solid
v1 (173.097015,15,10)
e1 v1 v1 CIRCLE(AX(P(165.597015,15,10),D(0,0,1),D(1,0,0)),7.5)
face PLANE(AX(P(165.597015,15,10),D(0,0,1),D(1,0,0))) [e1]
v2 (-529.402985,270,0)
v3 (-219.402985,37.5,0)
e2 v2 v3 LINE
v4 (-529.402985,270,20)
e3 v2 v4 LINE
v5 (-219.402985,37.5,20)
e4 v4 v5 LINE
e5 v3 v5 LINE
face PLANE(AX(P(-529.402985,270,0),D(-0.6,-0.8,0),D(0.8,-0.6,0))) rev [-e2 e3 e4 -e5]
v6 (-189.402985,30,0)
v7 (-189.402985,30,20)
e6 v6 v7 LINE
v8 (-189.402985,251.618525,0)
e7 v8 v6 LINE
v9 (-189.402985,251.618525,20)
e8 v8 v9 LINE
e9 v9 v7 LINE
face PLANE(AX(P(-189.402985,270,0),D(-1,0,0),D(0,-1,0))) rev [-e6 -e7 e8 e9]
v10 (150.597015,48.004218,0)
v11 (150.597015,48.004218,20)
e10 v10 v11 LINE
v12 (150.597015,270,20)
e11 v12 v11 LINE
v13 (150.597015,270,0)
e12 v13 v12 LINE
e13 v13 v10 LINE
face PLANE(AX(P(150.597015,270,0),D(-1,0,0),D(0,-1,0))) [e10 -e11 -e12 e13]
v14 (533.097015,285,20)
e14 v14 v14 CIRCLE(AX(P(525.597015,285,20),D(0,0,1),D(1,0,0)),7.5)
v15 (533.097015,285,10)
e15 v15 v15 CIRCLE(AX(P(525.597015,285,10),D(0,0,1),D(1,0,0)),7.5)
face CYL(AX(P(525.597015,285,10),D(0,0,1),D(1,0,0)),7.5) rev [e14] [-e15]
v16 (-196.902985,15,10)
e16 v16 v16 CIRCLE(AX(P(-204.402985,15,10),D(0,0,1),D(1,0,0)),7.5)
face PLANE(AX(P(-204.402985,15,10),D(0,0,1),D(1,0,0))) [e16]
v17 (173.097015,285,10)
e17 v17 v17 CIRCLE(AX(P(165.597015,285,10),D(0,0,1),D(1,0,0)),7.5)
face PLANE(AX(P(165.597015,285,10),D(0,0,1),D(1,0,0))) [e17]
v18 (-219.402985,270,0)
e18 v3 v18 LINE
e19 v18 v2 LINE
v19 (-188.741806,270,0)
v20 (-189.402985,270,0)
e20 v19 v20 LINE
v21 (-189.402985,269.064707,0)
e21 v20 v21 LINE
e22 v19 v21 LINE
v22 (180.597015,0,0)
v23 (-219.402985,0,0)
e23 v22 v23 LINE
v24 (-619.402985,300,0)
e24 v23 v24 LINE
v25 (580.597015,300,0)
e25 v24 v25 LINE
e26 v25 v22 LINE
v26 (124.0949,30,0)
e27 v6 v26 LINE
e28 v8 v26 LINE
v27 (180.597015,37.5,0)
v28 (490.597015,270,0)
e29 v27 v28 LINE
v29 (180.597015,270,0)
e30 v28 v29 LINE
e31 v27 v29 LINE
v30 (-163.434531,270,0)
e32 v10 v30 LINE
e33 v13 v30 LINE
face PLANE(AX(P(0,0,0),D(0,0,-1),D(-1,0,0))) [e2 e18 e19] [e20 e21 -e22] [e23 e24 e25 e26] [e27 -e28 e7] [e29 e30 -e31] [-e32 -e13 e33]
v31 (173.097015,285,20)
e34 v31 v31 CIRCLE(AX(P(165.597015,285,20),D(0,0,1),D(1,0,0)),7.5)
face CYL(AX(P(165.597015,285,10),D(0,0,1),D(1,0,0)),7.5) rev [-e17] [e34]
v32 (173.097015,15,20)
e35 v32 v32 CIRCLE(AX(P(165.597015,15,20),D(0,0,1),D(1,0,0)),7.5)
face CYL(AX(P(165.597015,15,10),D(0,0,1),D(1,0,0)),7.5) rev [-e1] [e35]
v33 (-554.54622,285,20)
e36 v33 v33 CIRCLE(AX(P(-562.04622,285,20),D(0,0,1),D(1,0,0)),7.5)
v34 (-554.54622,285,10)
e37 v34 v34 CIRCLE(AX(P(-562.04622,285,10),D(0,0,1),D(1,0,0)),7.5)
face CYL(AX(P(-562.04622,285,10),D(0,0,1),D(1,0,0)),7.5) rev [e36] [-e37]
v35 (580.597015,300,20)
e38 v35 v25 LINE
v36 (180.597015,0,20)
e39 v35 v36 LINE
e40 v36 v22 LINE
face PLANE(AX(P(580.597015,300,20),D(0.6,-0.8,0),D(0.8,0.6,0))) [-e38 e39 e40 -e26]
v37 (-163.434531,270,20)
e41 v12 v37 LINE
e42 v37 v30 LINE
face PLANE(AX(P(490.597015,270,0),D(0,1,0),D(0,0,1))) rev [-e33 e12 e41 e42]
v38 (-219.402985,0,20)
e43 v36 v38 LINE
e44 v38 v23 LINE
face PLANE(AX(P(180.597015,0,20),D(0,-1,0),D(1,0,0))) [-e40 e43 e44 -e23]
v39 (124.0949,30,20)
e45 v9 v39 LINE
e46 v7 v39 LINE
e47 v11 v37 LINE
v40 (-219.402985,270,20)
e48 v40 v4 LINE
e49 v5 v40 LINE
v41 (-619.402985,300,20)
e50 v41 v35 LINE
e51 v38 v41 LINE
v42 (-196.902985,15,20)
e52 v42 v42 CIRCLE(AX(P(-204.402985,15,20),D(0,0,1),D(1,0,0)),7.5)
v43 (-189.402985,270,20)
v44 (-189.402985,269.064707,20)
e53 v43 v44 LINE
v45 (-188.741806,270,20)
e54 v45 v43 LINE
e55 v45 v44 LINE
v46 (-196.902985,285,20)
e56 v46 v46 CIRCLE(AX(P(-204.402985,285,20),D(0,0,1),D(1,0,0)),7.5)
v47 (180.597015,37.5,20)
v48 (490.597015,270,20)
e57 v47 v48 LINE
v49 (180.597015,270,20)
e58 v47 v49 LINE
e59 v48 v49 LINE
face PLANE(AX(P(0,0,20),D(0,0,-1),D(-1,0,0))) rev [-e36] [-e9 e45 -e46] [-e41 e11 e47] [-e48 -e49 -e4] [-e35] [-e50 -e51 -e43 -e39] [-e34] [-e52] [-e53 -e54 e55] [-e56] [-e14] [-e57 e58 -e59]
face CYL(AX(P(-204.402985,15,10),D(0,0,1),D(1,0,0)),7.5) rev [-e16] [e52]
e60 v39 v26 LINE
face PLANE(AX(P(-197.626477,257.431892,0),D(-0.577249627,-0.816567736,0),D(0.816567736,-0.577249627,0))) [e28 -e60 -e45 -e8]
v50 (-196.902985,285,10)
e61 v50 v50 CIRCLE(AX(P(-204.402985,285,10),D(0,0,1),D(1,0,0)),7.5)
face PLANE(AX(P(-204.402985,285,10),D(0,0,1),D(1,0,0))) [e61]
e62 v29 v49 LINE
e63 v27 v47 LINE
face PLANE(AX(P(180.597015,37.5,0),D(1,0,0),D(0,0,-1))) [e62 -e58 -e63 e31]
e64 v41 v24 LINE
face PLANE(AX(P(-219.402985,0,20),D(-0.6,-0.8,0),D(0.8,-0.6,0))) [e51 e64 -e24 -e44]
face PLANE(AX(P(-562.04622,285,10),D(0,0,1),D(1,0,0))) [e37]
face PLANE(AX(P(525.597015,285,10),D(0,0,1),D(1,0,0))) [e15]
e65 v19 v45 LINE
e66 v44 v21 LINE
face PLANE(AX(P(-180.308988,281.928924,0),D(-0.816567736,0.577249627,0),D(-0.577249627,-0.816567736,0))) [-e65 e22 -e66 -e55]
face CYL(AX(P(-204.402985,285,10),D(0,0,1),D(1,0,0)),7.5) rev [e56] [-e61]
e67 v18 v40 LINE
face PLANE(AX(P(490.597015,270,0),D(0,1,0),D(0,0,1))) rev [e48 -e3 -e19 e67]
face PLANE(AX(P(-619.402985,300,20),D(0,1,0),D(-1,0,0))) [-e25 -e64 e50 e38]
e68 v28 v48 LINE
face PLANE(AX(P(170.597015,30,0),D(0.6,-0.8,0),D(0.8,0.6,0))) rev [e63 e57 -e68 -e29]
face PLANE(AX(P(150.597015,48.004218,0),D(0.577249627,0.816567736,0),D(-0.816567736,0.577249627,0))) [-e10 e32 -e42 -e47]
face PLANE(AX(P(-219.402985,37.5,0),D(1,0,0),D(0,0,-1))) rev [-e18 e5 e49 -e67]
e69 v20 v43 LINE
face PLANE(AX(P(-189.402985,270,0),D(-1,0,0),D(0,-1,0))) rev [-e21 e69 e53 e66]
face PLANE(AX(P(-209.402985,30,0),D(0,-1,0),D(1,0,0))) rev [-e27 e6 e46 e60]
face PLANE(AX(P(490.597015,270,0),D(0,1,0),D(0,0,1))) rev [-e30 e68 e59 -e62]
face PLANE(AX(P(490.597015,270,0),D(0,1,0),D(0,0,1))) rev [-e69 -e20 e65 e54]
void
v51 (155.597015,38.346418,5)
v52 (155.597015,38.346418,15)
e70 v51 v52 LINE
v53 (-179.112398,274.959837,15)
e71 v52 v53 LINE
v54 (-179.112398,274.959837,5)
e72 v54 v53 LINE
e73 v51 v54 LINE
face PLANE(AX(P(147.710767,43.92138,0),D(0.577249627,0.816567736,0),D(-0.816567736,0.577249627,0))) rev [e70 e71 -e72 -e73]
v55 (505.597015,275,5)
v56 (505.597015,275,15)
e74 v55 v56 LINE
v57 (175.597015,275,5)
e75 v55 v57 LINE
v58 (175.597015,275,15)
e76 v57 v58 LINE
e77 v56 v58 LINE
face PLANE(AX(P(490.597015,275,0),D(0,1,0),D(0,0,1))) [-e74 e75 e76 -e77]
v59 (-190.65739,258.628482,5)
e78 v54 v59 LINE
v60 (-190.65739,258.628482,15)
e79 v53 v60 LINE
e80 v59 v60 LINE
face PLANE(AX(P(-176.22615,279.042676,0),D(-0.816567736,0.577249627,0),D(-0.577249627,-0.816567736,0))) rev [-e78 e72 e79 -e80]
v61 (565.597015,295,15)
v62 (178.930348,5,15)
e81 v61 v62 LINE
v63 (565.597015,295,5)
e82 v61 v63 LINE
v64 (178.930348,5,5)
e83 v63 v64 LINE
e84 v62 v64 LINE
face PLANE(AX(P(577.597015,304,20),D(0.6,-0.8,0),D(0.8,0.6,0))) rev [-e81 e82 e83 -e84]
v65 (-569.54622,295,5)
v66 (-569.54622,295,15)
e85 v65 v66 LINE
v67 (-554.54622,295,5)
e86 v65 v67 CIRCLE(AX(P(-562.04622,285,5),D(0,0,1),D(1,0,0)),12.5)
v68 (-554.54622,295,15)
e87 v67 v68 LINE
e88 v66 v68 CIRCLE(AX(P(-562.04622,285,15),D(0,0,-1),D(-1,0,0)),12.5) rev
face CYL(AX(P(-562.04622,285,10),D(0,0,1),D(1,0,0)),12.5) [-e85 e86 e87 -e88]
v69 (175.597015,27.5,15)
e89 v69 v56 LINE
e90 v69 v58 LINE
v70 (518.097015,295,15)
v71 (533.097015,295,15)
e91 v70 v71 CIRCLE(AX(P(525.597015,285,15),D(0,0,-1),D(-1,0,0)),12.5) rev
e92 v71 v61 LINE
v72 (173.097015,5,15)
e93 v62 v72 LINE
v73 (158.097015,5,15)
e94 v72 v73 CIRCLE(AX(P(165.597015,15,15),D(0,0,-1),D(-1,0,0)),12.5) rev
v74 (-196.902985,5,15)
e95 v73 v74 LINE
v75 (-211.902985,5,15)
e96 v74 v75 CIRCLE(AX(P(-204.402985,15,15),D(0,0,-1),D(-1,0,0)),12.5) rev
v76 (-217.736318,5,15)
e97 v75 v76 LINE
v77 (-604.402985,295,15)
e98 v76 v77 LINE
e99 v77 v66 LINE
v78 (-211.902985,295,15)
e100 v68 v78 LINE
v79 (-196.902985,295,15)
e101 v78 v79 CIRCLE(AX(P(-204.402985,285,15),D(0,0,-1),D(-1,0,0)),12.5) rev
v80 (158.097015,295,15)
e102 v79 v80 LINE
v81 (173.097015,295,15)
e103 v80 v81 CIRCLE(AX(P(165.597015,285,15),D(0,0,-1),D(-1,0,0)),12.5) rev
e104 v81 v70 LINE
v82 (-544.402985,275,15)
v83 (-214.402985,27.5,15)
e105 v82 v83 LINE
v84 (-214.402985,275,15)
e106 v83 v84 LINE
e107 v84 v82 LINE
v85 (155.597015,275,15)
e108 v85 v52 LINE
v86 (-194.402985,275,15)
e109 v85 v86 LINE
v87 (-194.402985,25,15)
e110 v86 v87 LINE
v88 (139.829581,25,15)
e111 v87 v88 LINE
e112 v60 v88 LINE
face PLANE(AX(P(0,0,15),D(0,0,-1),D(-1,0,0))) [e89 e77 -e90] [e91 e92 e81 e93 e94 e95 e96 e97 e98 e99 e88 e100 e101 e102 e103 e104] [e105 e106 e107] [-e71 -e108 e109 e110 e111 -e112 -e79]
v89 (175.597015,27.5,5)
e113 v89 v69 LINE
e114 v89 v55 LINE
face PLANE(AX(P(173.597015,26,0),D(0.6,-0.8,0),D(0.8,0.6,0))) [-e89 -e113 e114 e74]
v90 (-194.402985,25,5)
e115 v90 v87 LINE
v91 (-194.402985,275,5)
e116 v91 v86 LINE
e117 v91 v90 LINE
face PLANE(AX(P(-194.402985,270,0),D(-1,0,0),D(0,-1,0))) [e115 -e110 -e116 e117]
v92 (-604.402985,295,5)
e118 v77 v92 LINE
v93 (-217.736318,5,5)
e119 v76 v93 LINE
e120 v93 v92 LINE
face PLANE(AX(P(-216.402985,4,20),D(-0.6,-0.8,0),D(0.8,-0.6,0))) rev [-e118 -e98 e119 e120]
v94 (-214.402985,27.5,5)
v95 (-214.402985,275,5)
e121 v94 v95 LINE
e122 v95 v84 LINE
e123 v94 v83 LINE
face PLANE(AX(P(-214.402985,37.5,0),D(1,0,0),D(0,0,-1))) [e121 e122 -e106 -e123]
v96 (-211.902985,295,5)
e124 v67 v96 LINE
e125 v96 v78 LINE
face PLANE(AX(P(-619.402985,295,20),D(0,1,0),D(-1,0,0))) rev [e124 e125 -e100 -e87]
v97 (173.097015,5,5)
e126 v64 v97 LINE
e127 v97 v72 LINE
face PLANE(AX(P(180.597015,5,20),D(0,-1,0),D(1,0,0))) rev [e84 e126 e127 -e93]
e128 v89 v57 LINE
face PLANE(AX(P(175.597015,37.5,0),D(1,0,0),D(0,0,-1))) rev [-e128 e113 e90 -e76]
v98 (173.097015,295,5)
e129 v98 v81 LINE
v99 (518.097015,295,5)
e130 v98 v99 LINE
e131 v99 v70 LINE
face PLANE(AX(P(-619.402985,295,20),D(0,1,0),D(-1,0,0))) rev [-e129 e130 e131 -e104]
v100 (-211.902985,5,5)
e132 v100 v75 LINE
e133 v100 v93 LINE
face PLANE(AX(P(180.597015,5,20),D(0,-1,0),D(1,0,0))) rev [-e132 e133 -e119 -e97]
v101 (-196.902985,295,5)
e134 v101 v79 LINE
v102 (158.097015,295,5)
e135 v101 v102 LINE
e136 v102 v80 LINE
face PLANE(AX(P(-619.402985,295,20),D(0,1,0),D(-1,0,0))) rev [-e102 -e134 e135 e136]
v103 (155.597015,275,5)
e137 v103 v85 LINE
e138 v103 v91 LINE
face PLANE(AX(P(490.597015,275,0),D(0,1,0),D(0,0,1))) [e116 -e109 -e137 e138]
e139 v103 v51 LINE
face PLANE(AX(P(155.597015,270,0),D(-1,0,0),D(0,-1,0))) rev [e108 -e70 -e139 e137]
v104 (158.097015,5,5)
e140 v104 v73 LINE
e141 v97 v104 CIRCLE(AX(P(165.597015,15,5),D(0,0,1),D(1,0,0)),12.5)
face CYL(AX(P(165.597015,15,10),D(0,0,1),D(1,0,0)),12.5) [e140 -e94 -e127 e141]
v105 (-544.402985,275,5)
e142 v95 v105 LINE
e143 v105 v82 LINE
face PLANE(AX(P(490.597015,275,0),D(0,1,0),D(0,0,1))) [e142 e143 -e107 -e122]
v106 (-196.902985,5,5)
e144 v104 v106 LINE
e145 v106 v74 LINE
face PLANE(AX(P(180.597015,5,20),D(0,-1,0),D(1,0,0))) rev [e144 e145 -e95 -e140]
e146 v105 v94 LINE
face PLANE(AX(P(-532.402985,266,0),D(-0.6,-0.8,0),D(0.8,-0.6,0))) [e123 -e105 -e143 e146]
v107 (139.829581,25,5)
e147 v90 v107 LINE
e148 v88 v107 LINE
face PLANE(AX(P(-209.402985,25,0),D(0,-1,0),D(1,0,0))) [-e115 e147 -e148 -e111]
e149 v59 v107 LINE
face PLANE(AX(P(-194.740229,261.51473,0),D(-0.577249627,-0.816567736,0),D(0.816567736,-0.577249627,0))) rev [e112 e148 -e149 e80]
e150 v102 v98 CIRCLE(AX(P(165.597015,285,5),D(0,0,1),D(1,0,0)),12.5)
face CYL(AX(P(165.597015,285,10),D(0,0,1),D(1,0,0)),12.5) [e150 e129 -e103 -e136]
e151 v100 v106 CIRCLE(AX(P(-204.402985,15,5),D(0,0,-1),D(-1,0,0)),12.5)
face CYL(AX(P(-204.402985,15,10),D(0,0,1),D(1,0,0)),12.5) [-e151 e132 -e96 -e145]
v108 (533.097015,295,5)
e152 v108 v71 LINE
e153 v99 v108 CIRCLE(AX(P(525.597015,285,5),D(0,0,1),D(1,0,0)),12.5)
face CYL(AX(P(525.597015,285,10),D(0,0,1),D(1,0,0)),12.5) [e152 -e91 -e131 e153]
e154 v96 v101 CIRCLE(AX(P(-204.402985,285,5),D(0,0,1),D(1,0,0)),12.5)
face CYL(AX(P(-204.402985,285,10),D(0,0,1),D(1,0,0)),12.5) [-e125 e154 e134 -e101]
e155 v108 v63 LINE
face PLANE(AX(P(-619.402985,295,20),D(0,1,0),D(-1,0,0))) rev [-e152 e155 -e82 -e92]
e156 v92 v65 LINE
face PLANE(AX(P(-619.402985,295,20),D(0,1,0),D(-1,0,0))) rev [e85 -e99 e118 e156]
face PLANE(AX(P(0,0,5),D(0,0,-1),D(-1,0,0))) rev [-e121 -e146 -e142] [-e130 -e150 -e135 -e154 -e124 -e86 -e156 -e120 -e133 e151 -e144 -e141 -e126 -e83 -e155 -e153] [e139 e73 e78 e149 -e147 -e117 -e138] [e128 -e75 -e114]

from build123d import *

# Parameters (mm, degrees)
BOSS_EXTRUDE1_DEPTH = 20
CUT_EXTRUDE1_DEPTH  = 20
BOSS_EXTRUDE3_DEPTH = 20
SKETCH6_R           = 7.5
CUT_EXTRUDE3_DEPTH  = 10
SHELL2_START        = 5
SHELL2_DEPTH        = 10


# Read off the part's stored shape, not the designer's step: Shell2
with BuildPart() as part:
    # Sketch2 → Boss-Extrude1 (new body)
    with BuildSketch(Plane.XY):
        Polygon((-219.402985075, 0), (-619.402985075, 300), (580.597014925, 300), (180.597014925, 0), align=None)
    extrude(amount=BOSS_EXTRUDE1_DEPTH)

    # Sketch3 → Cut-Extrude1 (cut)
    with BuildSketch(Plane.XY.offset(20)):
        Polygon((-529.402985075, 270), (-209.402985075, 30), (170.597014925, 30), (490.597014925, 270), align=None)
    extrude(amount=-CUT_EXTRUDE1_DEPTH, mode=Mode.SUBTRACT)

    # Sketch4 → Boss-Extrude3 (add)
    with BuildSketch(Plane.XY.offset(20)):
        Polygon((-219.402985075, 270), (-219.402985075, 37.5), (-219.402985075, 30), (-189.402985075, 30), (-189.402985075, 251.618524964), (-197.626477217, 257.431891774), (-189.402985075, 269.064707185), (-189.402985075, 270), align=None)
        Polygon((-180.308988395, 281.928923858), (-189.402985075, 269.064707185), (-189.402985075, 251.618524964), (141.766056114, 17.507872327), (150.597014925, 30), (150.597014925, 48.004218454), align=None)
        Polygon((-189.402985075, 251.618524964), (-189.402985075, 269.064707185), (-197.626477217, 257.431891774), align=None)
        Polygon((158.892990534, 42.497071205), (150.597014925, 48.004218454), (150.597014925, 30), align=None)
        Polygon((150.597014925, 270), (150.597014925, 48.004218454), (158.892990534, 42.497071205), (150.597014925, 30), (180.597014925, 30), (180.597014925, 37.5), (180.597014925, 270), align=None)
    extrude(amount=-BOSS_EXTRUDE3_DEPTH)

    # Sketch6 → Cut-Extrude3 (cut)
    with BuildSketch(Plane.XY.offset(20)):
        with Locations((-204.402985075, 285)):
            Circle(SKETCH6_R)
        with Locations((-204.402985075, 15)):
            Circle(SKETCH6_R)
        with Locations((165.597014925, 15)):
            Circle(SKETCH6_R)
        with Locations((165.597014925, 285)):
            Circle(SKETCH6_R)
        with Locations((525.597014925, 285)):
            Circle(SKETCH6_R)
        with Locations((-562.046220464, 285)):
            Circle(SKETCH6_R)
    extrude(amount=-CUT_EXTRUDE3_DEPTH, mode=Mode.SUBTRACT)

    # Shell2 outline → Shell2 (cut)
    with BuildSketch(Plane.XY.offset(SHELL2_START)):
        with BuildLine():
            ThreePointArc((-554.546220464, 295), (-562.046220464, 272.5), (-569.546220464, 295))
            Line((-569.546220464, 295), (-604.402985075, 295))
            Line((-604.402985075, 295), (-217.736318408, 5))
            Line((-217.736318408, 5), (-211.902985075, 5))
            ThreePointArc((-211.902985075, 5), (-204.402985075, 27.5), (-196.902985075, 5))
            Line((-196.902985075, 5), (158.097014925, 5))
            ThreePointArc((158.097014925, 5), (165.597014925, 27.5), (173.097014925, 5))
            Line((173.097014925, 5), (178.930348259, 5))
            Line((178.930348259, 5), (565.597014925, 295))
            Line((565.597014925, 295), (533.097014925, 295))
            ThreePointArc((533.097014925, 295), (525.597014925, 272.5), (518.097014925, 295))
            Line((518.097014925, 295), (173.097014925, 295))
            ThreePointArc((173.097014925, 295), (165.597014925, 272.5), (158.097014925, 295))
            Line((158.097014925, 295), (-196.902985075, 295))
            ThreePointArc((-196.902985075, 295), (-204.402985075, 272.5), (-211.902985075, 295))
            Line((-211.902985075, 295), (-554.546220464, 295))
        make_face()
        Polygon((-544.402985075, 275), (-214.402985075, 275), (-214.402985075, 27.5), align=None, mode=Mode.SUBTRACT)
        Polygon((-194.402985075, 275), (155.597014925, 275), (155.597014925, 38.346418141), (-179.112397852, 274.95983704), (-190.657390399, 258.628482317), (139.829580663, 25), (-194.402985075, 25), align=None, mode=Mode.SUBTRACT)
        Polygon((175.597014925, 275), (505.597014925, 275), (175.597014925, 27.5), align=None, mode=Mode.SUBTRACT)
    extrude(amount=SHELL2_DEPTH, mode=Mode.SUBTRACT)


solid = part.part
